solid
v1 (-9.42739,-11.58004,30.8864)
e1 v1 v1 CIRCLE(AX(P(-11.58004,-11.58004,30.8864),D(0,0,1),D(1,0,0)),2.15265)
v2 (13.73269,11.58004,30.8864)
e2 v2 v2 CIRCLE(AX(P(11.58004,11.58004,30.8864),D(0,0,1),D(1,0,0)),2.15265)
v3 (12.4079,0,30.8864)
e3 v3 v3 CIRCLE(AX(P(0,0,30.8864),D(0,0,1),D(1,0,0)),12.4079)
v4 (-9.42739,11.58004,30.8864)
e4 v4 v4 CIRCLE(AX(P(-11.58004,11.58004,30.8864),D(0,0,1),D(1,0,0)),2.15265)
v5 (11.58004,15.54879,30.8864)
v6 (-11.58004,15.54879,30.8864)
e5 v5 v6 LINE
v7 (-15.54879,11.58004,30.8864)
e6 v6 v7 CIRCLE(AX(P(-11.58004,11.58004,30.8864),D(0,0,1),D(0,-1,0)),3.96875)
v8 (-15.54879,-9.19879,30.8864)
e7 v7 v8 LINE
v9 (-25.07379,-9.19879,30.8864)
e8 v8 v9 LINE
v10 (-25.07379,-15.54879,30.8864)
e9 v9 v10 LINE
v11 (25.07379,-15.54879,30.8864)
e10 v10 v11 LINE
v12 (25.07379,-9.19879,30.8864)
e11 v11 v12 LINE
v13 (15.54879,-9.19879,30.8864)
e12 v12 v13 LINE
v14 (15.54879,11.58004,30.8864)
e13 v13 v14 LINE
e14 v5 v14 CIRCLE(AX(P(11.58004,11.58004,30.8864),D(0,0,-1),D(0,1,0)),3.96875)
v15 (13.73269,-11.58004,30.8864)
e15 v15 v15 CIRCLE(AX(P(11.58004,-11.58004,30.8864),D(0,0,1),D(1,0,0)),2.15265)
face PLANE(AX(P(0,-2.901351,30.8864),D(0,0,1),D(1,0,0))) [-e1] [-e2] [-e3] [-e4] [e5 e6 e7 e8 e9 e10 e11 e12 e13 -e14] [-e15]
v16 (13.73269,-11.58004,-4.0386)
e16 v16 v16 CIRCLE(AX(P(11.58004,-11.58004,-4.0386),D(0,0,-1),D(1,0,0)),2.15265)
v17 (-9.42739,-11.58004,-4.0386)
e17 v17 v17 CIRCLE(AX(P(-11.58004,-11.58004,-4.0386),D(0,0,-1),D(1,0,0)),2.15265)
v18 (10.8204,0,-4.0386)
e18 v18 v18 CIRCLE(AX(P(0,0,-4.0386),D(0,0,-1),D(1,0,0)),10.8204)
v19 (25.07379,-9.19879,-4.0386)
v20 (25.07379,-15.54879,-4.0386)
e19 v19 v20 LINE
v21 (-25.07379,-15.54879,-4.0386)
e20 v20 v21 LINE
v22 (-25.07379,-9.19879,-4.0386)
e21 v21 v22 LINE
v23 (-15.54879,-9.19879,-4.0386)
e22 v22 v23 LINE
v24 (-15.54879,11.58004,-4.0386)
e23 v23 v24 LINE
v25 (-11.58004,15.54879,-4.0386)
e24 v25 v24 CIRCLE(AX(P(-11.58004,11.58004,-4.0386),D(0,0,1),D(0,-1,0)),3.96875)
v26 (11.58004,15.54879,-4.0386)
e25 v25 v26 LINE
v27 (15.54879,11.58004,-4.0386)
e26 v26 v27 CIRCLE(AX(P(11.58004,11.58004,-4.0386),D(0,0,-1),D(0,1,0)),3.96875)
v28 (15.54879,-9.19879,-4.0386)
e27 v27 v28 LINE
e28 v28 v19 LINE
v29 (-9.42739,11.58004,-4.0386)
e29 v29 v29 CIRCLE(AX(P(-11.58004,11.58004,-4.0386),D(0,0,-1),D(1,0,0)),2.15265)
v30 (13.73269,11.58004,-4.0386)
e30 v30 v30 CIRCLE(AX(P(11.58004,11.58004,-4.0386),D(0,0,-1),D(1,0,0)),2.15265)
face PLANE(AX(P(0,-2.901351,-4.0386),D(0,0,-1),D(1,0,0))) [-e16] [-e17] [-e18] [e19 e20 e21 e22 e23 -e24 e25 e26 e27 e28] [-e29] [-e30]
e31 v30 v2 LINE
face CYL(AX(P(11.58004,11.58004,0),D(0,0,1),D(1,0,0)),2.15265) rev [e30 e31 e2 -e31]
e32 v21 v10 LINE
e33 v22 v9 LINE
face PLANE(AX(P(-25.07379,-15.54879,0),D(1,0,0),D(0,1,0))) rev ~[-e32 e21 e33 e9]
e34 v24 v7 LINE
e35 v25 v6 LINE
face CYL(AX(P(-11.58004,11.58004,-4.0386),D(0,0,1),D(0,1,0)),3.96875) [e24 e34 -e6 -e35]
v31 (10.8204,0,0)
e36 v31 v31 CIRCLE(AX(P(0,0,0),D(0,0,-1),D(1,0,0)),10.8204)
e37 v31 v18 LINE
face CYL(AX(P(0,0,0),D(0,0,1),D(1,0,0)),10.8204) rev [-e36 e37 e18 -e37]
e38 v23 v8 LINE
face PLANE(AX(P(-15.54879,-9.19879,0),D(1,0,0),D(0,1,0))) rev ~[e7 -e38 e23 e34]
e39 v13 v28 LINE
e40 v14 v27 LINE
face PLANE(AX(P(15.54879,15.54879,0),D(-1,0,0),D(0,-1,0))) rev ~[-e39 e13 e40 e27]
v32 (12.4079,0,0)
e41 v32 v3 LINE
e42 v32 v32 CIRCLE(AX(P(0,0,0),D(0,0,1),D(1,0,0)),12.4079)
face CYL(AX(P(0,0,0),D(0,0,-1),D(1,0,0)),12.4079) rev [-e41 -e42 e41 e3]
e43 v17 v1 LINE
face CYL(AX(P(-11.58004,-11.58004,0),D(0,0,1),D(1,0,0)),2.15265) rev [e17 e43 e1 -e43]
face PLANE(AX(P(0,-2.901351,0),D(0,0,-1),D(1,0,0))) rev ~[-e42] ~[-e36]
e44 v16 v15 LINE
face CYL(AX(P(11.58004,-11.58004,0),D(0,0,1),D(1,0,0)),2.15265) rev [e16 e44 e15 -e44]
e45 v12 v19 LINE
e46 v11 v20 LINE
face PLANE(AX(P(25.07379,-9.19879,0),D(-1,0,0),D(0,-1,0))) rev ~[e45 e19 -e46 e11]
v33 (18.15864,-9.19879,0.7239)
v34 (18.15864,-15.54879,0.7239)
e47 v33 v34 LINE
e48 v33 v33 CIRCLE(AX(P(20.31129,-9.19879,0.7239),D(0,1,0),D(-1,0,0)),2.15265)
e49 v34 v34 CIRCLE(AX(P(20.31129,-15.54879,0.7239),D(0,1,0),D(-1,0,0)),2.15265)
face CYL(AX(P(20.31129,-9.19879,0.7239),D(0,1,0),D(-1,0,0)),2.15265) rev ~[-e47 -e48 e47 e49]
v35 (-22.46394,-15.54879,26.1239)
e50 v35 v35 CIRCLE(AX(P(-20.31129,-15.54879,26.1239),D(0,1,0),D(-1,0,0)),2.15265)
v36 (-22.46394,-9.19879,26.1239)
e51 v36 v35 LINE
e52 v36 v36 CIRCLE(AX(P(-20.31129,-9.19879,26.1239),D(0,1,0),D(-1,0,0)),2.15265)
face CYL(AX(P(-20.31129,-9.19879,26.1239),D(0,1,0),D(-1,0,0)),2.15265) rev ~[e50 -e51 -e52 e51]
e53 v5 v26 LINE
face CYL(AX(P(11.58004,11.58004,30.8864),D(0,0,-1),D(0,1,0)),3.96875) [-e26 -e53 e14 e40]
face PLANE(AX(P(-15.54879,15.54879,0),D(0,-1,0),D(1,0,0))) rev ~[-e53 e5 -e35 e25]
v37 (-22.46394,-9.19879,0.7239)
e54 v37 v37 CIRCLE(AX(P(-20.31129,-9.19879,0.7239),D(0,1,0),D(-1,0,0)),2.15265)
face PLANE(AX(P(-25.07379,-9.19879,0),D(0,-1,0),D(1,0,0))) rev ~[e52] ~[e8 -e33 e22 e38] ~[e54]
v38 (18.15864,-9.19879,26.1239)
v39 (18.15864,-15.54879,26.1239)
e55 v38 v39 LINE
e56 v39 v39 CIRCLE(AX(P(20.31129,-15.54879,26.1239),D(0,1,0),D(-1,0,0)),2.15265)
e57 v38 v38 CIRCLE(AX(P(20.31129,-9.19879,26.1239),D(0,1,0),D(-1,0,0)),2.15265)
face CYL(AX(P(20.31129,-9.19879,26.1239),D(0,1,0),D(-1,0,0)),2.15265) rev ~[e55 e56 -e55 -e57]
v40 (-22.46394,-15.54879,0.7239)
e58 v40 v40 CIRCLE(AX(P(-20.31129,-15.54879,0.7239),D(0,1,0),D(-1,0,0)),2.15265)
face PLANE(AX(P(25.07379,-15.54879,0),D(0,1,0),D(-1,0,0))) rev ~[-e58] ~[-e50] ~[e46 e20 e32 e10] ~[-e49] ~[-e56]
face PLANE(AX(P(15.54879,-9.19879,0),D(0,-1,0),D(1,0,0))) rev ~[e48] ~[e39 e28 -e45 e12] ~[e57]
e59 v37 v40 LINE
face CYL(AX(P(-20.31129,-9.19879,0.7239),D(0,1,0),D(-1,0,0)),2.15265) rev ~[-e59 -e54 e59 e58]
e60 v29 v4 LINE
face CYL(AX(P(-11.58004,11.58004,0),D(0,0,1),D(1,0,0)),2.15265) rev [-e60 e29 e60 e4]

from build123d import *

# Parameters (mm, degrees)
F0_R     = 2.15265
F0_R_2   = 12.4079
F1_DEPTH = 30.8864
F2_R     = 2.15265
F2_R_2   = 12.4079
F2_R_3   = 10.8204
F3_DEPTH = 4.0386
F4_R     = 2.15265
F5_DEPTH = 6.35
F6_R     = 3.96875


with BuildPart() as f1:
    # F0 (on Top) → F1 (new body)
    with BuildSketch(Plane.XY):
        Polygon((15.5487902681, 15.5487902681), (-15.5487902681, 15.5487902681), (-15.5487902681, -9.1987902681), (-25.0737902681, -9.1987902681), (-25.0737902681, -15.5487902681), (25.0737902681, -15.5487902681), (25.0737902681, -9.1987902681), (15.5487902681, -9.1987902681), align=None)
        with Locations((-11.5800402681, -11.5800402681)):
            Circle(F0_R, mode=Mode.SUBTRACT)
        with Locations((11.5800402681, -11.5800402681)):
            Circle(F0_R, mode=Mode.SUBTRACT)
        with Locations((-11.5800402681, 11.5800402681)):
            Circle(F0_R, mode=Mode.SUBTRACT)
        Circle(F0_R_2, mode=Mode.SUBTRACT)
        with Locations((11.5800402681, 11.5800402681)):
            Circle(F0_R, mode=Mode.SUBTRACT)
    extrude(amount=F1_DEPTH)

    # F2 (on face) → F3 (join)
    with BuildSketch(Plane(origin=(0, 0, 0), x_dir=(1, 0, 0), z_dir=(0, 0, -1))):
        Polygon((-15.5487902681, -15.5487902681), (15.5487902681, -15.5487902681), (15.5487902681, 9.1987902681), (25.0737902681, 9.1987902681), (25.0737902681, 15.5487902681), (-25.0737902681, 15.5487902681), (-25.0737902681, 9.1987902681), (-15.5487902681, 9.1987902681), align=None)
        with Locations((-11.5800402681, -11.5800402681)):
            Circle(F2_R, mode=Mode.SUBTRACT)
        with Locations((11.5800402681, -11.5800402681)):
            Circle(F2_R, mode=Mode.SUBTRACT)
        with Locations((-11.5800402681, 11.5800402681)):
            Circle(F2_R, mode=Mode.SUBTRACT)
        Circle(F2_R_2, mode=Mode.SUBTRACT)
        with Locations((11.5800402681, 11.5800402681)):
            Circle(F2_R, mode=Mode.SUBTRACT)
        Circle(F2_R_2)
        Circle(F2_R_3, mode=Mode.SUBTRACT)
    extrude(amount=F3_DEPTH)

    # F4 (on face) → F5 (cut, through all)
    with BuildSketch(Plane(origin=(0, -9.1987902681, 0), x_dir=(-1, 0, 0), z_dir=(0, 1, 0))):
        with Locations((-20.3112902681, 0.7239)):
            Circle(F4_R)
        with Locations((-20.3112902681, 26.1239)):
            Circle(F4_R)
        with Locations((20.3112902681, 26.1239)):
            Circle(F4_R)
        with Locations((20.3112902681, 0.7239)):
            Circle(F4_R)
    extrude(amount=-F5_DEPTH, mode=Mode.SUBTRACT)

    # F6
    f6_edges = [f1.edges().sort_by_distance(p)[0] for p in [
        (-15.54879, 15.54879, 13.4239),
        (15.54879, 15.54879, 13.4239),
    ]]
    fillet(f6_edges, radius=F6_R)


solid = f1.part
